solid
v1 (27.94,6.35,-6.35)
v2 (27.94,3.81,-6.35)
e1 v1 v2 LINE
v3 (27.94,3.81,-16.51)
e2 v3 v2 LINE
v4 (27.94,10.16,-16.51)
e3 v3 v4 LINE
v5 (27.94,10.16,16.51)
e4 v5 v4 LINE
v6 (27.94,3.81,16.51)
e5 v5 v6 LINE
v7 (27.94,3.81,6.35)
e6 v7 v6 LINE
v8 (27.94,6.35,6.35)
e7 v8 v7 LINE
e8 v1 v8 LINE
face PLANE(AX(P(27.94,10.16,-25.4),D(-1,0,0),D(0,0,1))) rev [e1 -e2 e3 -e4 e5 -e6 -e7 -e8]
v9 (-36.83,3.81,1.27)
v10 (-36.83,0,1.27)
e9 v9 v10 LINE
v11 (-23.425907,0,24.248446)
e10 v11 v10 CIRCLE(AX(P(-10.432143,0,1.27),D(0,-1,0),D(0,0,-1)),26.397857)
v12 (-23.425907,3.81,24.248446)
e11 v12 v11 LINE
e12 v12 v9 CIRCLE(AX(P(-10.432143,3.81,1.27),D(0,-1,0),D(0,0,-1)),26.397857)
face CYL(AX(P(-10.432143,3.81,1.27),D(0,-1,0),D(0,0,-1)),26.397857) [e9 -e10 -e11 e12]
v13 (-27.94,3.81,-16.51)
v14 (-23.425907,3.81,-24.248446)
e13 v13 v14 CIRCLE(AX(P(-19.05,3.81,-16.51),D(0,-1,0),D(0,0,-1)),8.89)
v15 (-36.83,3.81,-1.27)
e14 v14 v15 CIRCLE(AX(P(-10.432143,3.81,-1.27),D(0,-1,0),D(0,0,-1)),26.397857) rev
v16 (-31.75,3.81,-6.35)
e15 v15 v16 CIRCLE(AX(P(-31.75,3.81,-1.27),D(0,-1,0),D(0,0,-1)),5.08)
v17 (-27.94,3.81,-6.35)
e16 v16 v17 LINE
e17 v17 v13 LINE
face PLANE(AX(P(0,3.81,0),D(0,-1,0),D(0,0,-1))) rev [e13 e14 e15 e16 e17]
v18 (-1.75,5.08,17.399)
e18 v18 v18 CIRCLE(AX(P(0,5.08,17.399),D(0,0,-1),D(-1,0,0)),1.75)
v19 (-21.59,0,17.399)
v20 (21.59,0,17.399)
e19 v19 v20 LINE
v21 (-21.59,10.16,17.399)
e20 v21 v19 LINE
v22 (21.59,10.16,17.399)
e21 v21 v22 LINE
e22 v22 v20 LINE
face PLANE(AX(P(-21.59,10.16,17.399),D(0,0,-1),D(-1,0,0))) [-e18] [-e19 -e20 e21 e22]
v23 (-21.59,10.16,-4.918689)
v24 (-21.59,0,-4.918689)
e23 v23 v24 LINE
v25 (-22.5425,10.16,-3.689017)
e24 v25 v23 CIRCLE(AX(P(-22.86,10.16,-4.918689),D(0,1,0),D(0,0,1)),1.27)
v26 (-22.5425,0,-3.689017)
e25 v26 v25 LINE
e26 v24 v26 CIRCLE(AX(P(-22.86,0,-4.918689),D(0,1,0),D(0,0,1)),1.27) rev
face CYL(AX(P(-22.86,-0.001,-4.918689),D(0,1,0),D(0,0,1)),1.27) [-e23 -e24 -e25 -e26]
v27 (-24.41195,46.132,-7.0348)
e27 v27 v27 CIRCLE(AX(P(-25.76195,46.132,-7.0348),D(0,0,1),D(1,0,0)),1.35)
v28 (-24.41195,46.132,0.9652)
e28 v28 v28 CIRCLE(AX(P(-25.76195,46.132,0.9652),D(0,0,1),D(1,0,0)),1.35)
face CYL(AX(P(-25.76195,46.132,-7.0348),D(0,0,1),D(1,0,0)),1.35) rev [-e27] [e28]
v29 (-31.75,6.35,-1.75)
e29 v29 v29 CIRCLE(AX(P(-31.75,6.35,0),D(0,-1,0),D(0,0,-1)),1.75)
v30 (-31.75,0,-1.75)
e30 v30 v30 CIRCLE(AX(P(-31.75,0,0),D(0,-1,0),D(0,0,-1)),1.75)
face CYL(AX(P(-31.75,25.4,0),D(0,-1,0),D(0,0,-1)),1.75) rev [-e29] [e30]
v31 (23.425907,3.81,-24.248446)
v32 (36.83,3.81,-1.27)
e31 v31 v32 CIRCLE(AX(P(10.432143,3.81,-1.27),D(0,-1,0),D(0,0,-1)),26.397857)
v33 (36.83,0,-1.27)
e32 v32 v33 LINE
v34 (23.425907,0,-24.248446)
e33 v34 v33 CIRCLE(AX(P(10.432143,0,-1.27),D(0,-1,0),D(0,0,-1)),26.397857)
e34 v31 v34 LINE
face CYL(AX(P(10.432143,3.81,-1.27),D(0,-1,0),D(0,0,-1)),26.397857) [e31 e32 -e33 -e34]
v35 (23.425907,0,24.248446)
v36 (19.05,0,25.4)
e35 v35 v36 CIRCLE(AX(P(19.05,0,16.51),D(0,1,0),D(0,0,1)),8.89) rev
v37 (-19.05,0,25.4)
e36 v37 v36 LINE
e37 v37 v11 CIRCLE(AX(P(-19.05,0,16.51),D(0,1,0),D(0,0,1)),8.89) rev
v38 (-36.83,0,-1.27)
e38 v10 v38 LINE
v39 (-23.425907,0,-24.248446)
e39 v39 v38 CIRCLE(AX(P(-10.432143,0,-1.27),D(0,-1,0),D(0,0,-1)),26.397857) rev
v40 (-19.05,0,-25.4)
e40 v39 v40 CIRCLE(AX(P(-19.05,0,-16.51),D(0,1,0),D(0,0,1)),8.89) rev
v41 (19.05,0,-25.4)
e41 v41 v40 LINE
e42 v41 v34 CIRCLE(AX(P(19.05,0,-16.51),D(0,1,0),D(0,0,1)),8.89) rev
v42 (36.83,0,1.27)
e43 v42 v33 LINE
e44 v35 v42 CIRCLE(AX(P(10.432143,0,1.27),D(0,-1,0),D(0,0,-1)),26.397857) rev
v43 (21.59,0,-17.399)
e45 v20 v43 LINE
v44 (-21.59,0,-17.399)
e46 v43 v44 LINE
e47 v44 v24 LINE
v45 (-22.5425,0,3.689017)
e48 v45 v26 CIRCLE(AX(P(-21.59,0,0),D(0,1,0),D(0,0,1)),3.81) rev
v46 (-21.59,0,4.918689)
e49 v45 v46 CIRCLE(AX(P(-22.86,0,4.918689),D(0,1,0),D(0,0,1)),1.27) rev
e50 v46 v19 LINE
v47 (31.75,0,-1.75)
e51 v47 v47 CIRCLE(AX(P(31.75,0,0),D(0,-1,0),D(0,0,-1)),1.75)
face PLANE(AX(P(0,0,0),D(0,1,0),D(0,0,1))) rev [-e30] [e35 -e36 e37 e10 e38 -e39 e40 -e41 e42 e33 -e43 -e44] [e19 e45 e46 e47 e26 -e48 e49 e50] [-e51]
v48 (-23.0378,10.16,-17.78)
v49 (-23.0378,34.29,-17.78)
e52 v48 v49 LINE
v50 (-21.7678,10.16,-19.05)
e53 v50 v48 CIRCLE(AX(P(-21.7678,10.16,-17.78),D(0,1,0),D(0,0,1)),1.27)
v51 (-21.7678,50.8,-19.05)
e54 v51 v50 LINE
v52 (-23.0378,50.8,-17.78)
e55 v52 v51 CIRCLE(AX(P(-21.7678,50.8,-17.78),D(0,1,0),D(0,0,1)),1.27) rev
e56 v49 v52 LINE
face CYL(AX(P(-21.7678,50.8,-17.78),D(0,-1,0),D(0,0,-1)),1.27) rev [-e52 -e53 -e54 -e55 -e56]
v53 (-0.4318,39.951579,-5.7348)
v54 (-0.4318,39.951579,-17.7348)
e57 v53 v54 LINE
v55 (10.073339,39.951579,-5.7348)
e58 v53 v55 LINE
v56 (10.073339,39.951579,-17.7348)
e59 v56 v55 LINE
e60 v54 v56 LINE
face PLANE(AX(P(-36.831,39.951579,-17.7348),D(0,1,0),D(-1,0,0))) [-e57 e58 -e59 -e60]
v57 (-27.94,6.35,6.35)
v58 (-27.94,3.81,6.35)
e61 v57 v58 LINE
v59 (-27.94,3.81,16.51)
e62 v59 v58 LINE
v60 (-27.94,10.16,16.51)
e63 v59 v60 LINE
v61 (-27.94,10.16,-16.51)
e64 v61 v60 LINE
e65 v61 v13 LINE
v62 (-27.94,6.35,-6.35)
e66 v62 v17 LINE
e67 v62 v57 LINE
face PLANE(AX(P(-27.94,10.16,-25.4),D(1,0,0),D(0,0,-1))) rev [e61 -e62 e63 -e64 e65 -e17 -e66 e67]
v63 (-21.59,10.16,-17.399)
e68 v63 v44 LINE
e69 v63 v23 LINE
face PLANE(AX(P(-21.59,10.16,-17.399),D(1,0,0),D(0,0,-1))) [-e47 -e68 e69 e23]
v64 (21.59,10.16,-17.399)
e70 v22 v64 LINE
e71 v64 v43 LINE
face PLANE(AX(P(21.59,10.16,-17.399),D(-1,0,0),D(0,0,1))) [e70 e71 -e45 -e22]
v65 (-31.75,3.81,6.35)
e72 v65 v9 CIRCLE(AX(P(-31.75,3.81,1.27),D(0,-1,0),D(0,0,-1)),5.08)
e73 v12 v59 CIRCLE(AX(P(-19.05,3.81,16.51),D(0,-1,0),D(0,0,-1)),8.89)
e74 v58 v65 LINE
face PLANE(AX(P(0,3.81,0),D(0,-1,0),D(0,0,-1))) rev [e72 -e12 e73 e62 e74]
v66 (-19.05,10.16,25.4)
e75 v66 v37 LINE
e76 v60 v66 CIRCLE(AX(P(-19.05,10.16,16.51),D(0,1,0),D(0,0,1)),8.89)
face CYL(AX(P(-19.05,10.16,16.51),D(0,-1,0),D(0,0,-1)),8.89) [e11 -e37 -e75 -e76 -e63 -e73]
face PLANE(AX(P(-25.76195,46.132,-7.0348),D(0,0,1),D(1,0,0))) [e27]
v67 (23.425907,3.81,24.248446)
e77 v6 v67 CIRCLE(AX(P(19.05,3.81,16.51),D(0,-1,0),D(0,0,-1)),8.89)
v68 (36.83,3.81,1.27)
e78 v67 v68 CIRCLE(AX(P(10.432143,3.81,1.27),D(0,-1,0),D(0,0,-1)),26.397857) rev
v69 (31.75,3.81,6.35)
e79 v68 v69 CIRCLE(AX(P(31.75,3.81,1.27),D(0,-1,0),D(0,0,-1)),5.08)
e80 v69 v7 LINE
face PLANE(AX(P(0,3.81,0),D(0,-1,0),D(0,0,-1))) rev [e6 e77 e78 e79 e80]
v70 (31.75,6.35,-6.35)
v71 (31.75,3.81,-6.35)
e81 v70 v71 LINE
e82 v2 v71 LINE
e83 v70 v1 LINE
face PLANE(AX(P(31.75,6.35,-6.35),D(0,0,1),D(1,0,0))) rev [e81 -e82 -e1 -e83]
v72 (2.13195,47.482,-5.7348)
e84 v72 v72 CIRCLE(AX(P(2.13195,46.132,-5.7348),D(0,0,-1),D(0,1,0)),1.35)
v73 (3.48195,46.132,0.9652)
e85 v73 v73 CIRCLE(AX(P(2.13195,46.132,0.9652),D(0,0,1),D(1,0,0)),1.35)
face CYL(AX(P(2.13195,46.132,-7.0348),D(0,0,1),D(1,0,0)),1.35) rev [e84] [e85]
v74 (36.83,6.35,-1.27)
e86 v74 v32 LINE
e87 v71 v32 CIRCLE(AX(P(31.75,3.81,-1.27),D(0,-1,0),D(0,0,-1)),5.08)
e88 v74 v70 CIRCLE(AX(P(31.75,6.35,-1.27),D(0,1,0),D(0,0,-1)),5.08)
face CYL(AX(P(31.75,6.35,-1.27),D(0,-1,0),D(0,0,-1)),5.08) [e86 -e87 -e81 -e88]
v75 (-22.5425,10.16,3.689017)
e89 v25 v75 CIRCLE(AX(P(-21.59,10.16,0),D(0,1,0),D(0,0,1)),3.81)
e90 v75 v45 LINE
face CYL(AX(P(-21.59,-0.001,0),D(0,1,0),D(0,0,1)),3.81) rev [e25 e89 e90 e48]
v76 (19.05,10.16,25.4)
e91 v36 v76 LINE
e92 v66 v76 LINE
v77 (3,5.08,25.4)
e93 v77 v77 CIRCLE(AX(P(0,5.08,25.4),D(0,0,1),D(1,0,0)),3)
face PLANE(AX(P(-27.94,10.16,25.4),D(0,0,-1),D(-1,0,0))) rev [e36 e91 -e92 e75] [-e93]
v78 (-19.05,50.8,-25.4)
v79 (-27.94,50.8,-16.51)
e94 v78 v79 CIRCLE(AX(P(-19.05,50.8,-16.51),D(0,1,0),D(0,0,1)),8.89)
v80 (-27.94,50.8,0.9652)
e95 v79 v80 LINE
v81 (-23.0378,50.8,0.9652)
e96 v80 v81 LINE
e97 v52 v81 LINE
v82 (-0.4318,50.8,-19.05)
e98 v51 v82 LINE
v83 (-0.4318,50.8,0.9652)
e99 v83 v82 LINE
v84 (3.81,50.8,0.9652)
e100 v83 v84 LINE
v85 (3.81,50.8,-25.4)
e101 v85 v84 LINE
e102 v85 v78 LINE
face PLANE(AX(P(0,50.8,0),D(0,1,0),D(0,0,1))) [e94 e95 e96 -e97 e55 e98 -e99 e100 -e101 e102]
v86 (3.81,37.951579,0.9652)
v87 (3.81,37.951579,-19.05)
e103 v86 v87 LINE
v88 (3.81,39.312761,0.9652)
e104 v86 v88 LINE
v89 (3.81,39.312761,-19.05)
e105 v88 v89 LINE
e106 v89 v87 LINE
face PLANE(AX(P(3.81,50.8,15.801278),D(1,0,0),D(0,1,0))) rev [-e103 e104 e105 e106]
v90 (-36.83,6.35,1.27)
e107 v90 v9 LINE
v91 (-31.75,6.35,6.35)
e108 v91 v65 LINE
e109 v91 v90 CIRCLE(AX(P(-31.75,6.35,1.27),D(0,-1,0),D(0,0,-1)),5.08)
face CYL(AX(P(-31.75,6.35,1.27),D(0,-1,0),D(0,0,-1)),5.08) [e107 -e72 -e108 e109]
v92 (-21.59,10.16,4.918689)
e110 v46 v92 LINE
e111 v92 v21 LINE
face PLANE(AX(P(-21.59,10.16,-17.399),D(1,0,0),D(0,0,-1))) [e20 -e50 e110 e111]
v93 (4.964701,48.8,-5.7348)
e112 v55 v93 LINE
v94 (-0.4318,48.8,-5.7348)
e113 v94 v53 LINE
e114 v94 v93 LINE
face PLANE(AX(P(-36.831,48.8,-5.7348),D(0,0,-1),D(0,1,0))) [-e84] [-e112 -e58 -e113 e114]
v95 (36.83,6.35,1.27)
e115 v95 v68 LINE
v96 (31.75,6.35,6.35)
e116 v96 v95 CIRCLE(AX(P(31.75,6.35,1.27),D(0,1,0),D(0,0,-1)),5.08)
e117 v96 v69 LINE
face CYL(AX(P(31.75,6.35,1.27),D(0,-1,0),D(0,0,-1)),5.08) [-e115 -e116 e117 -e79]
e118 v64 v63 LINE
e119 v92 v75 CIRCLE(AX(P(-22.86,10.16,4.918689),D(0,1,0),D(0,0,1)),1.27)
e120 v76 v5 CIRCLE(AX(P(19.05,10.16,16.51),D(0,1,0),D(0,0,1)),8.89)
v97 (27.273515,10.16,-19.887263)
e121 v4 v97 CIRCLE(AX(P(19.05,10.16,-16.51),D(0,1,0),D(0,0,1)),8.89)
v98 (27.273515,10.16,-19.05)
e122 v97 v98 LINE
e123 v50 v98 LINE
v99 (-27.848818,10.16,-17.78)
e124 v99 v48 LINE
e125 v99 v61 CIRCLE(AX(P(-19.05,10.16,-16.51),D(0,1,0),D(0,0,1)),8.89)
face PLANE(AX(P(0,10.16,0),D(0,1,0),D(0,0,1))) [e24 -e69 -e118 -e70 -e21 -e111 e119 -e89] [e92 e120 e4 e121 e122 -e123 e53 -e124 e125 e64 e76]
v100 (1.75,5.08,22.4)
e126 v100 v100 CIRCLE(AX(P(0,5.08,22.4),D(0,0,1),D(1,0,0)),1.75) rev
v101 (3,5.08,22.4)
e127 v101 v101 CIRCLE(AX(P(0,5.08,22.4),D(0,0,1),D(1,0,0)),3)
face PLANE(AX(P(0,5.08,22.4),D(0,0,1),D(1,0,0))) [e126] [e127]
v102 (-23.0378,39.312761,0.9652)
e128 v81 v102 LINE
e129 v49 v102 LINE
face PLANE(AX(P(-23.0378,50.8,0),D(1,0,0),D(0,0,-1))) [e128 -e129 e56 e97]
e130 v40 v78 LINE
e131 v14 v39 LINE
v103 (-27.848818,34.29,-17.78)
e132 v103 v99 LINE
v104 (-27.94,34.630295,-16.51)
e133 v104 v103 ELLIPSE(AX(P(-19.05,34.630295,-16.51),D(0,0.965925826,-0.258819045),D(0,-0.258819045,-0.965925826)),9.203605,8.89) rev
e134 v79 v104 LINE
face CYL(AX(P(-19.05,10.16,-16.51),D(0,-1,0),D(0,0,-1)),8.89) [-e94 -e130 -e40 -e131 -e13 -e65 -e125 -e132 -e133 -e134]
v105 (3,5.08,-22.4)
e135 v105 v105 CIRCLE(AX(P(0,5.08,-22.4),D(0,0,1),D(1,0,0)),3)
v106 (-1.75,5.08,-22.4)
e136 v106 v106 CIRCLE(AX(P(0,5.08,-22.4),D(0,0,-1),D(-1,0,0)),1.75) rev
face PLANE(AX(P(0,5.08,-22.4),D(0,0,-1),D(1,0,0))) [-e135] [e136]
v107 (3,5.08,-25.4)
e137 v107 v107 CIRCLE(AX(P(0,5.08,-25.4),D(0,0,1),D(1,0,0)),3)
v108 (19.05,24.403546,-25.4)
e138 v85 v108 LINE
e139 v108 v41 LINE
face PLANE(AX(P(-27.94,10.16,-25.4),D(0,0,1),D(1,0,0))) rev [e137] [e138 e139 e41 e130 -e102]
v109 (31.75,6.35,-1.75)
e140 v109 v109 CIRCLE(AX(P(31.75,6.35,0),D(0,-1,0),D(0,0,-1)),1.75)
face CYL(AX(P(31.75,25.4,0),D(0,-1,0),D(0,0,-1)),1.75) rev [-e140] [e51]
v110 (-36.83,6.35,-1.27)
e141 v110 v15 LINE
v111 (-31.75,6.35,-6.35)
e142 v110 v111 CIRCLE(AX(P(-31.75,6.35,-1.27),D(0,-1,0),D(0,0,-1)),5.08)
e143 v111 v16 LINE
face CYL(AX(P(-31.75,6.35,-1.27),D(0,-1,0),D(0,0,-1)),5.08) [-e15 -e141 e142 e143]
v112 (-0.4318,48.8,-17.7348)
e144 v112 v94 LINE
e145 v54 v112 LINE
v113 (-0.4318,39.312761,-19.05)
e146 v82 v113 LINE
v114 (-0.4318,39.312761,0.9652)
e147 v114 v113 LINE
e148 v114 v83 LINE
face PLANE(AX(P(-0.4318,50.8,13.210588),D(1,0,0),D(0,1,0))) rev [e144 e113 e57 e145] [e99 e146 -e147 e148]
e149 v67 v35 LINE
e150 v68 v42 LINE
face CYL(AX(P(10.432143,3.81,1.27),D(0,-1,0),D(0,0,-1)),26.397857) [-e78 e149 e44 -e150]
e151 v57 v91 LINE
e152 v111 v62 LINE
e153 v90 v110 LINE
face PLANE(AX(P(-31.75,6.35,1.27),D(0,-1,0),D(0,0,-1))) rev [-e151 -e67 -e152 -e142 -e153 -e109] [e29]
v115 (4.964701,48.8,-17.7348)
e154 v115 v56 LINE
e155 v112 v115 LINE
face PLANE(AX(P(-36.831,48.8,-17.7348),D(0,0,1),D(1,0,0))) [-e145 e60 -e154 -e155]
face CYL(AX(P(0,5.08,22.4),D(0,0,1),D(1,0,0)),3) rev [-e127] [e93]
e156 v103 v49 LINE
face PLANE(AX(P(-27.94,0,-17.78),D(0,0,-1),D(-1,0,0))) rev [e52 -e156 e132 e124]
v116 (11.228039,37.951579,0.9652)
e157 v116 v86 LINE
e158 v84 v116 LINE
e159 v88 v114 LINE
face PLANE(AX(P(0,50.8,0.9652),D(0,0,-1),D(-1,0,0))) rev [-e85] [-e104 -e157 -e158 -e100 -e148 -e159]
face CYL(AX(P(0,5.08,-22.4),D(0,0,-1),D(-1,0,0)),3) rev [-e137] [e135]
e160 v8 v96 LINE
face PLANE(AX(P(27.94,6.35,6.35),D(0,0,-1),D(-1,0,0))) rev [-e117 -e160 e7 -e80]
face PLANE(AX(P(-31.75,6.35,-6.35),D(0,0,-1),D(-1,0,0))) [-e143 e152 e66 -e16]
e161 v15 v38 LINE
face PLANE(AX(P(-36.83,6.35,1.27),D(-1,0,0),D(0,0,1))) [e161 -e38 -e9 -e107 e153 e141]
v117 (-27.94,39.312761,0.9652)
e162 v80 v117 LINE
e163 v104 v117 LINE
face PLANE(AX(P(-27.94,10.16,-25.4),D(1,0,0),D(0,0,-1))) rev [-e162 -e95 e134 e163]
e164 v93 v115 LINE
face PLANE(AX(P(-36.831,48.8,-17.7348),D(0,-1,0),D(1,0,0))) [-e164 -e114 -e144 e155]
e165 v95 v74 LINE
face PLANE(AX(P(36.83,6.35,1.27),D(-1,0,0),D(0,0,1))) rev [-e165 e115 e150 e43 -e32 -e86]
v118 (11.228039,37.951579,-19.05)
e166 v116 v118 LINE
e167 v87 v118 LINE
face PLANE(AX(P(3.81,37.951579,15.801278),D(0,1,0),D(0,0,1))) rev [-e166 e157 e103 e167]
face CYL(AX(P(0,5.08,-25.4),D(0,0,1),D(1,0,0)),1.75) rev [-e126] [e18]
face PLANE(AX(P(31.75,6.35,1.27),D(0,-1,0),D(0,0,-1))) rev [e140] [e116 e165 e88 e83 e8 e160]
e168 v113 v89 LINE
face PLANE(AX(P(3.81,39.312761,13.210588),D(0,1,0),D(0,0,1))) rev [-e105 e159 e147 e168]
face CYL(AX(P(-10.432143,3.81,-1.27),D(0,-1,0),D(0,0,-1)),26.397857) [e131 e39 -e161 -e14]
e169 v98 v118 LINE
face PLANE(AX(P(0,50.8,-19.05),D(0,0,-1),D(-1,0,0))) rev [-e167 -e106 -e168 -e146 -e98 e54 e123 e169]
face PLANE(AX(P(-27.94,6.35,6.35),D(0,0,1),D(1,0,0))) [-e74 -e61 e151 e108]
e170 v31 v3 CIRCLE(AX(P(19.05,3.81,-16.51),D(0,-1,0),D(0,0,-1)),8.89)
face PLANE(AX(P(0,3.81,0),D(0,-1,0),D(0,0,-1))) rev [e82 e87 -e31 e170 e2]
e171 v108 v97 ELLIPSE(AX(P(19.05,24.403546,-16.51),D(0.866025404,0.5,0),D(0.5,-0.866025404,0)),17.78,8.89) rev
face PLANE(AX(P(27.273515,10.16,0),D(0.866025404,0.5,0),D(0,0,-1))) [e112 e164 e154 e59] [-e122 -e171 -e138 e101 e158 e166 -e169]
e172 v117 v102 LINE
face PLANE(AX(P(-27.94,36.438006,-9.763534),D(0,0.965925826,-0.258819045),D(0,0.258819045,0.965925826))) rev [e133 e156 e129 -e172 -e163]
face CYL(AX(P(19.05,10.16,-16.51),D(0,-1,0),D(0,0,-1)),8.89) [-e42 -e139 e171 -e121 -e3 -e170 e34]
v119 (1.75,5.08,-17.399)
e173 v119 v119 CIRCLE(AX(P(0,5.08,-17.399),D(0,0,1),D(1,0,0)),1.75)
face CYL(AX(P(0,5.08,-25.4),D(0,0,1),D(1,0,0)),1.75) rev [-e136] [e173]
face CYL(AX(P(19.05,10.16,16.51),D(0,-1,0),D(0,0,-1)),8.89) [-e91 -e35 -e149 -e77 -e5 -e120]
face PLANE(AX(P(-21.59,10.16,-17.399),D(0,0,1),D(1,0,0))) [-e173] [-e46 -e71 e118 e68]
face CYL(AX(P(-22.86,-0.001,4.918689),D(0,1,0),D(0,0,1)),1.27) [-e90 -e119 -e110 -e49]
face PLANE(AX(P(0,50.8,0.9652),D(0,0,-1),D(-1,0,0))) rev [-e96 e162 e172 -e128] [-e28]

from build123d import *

# Parameters (mm, degrees)
SKETCH1_W           = 55.88
SKETCH1_H           = 50.8
SKETCH1_W_2         = 43.18
SKETCH1_H_2         = 34.798
BOSS_EXTRUDE1_DEPTH = 10.16
SKETCH2_R           = 1.75
CUT_EXTRUDE1_DEPTH  = 59.860081549
SKETCH3_R           = 3
CUT_EXTRUDE2_DEPTH  = 3
SKETCH4_W           = 4.9022
SKETCH4_H           = 20.0152
BOSS_EXTRUDE2_DEPTH = 40.64
CUT_EXTRUDE3_DEPTH  = 77.318648395
FILLET1_R           = 8.89
CHAMFER2_SIZE2      = 40.64
CHAMFER2_SIZE       = 23.46351494
SKETCH6_W           = 4.2418
SKETCH6_H           = 11.487238798
BOSS_EXTRUDE3_DEPTH = 20.0152
BOSS_EXTRUDE5_DEPTH = 20.0152
SKETCH9_R           = 1.35
CUT_EXTRUDE4_DEPTH  = 8
FILLET2_R           = 1.27
BOSS_EXTRUDE6_DEPTH = 6.35
SKETCH11_R          = 1.75
CUT_EXTRUDE5_DEPTH  = 25.4
BOSS_EXTRUDE7_DEPTH = 3.81
CUT_EXTRUDE6_REACH  = 76.62
SKETCH13_W          = 12
SKETCH13_H          = 8.848420696
CUT_EXTRUDE9_REACH  = 62.442
FILLET3_R           = 1.27


# Some blends are built 0.0001 mm under size
with BuildPart() as part:
    # Sketch1 → Boss-Extrude1 (new body)
    with BuildSketch(Plane(origin=(0, 0, 0), x_dir=(1, 0, 0), z_dir=(0, 1, 0))):
        Rectangle(SKETCH1_W, SKETCH1_H)
        Rectangle(SKETCH1_W_2, SKETCH1_H_2, mode=Mode.SUBTRACT)
    extrude(amount=BOSS_EXTRUDE1_DEPTH)

    # Sketch2 → Cut-Extrude1 (cut, through all)
    with BuildSketch(Plane.XY.offset(25.4)):
        with Locations((0, 5.08)):
            Circle(SKETCH2_R)
    extrude(amount=-CUT_EXTRUDE1_DEPTH, mode=Mode.SUBTRACT)

    # Sketch3 → Cut-Extrude2 (cut)
    with BuildSketch(Plane.XY.offset(25.4)):
        with Locations((0, 5.08)):
            Circle(SKETCH3_R)
    cut_extrude2 = extrude(amount=-CUT_EXTRUDE2_DEPTH, mode=Mode.SUBTRACT)

    # Sketch4 → Boss-Extrude2 (add)
    with BuildSketch(Plane(origin=(0, 10.16, 0), x_dir=(1, 0, 0), z_dir=(0, 1, 0))):
        with Locations((-25.4889, 9.0424)):
            Rectangle(SKETCH4_W, SKETCH4_H)
        Polygon((3.81, 25.4), (-27.94, 25.4), (-27.94, 19.05), (-23.0378, 19.05), (3.81, 19.05), align=None)
    extrude(amount=BOSS_EXTRUDE2_DEPTH)

    # Sketch5 → Cut-Extrude3 (cut, through all)
    with BuildSketch(Plane(origin=(-23.0378, 0, 0), x_dir=(0, 0, -1), z_dir=(1, 0, 0))):
        Polygon((17.78, 34.29), (-0.9652, 39.312761202), (-0.9652, 10.16), (17.78, 10.16), align=None)
    extrude(amount=-CUT_EXTRUDE3_DEPTH, mode=Mode.SUBTRACT)

    # Fillet1
    # the kernel refuses this fillet: 8.89 mm, written as the material it takes off along each edge
    with BuildSketch(Plane(origin=(-27.94, -22.225, 25.4), x_dir=(1, 0, 0), z_dir=(0, 1, 0)), Plane(origin=(27.94, -22.225, -25.4), x_dir=(-1, 0, 0), z_dir=(0, 1, 0))) as fillet1_piece_1:
        with BuildLine():
            CenterArc((FILLET1_R, FILLET1_R), FILLET1_R, 180, 90)
            Line((0, FILLET1_R), (0, 0))
            Line((0, 0), (FILLET1_R, 0))
        make_face()
    extrude(amount=54.61, mode=Mode.SUBTRACT)
    with BuildSketch(Plane(origin=(-27.94, -22.225, -25.4), x_dir=(1, 0, 0), z_dir=(0, 1, 0))) as fillet1_piece_2:
        with BuildLine():
            CenterArc((FILLET1_R, -FILLET1_R), FILLET1_R, 90, 90)
            Line((0, -FILLET1_R), (0, 0))
            Line((0, 0), (FILLET1_R, 0))
        make_face()
    extrude(amount=95.25, mode=Mode.SUBTRACT)
    with BuildSketch(Plane(origin=(27.94, -22.225, 25.4), x_dir=(-1, 0, 0), z_dir=(0, 1, 0))) as fillet1_piece_3:
        with BuildLine():
            CenterArc((FILLET1_R, -FILLET1_R), FILLET1_R, 90, 90)
            Line((0, -FILLET1_R), (0, 0))
            Line((0, 0), (FILLET1_R, 0))
        make_face()
    extrude(amount=54.61, mode=Mode.SUBTRACT)

    # Chamfer2
    chamfer2_edges = [part.edges().sort_by_distance(p)[0] for p in [
        (3.81, 10.16, -22.225),
    ]]
    chamfer2_side = [part.faces().sort_by_distance(p)[0] for p in [
        (4.279270299, 10.16, -22.225),
    ]]
    chamfer(chamfer2_edges, length=CHAMFER2_SIZE - 0.0001, length2=CHAMFER2_SIZE2 - 0.0001, reference=chamfer2_side[0])  # a hair under: the kernel refuses the full size

    # Sketch6 → Boss-Extrude3 (add)
    with BuildSketch(Plane.XY.offset(-19.05)):
        with Locations((1.6891, 45.056380601)):
            Rectangle(SKETCH6_W, SKETCH6_H)
    extrude(amount=BOSS_EXTRUDE3_DEPTH)

    # Sketch8 → Boss-Extrude5 (add)
    with BuildSketch(Plane.XY.offset(-19.05)):
        Polygon((3.81, 50.8), (3.81, 37.951579304), (11.228039147, 37.951579304), align=None)
    extrude(amount=BOSS_EXTRUDE5_DEPTH)

    # Sketch9 → Cut-Extrude4 (cut)
    with BuildSketch(Plane.XY.offset(0.9652)):
        with Locations((2.13195, 46.132)):
            Circle(SKETCH9_R)
        with Locations((-25.76195, 46.132)):
            Circle(SKETCH9_R)
    extrude(amount=-CUT_EXTRUDE4_DEPTH, mode=Mode.SUBTRACT)

    # Fillet2
    fillet2_edges = [part.edges().sort_by_distance(p)[0] for p in [
        (-23.0378, 30.48, -19.05),
    ]]
    fillet(fillet2_edges, radius=FILLET2_R)

    # Mirror1: Cut-Extrude2 across plane
    add(cut_extrude2.mirror(Plane.XY), mode=Mode.SUBTRACT)

    # Sketch10 → Boss-Extrude6 (add)
    with BuildSketch(Plane.XZ):
        with BuildLine():
            Line((-27.94, 0), (-27.94, 6.35))
            Line((-27.94, 6.35), (-31.75, 6.35))
            ThreePointArc((-31.75, 6.35), (-35.342102448, 4.862102448), (-36.83, 1.27))
            Line((-36.83, 1.27), (-36.83, -1.27))
            ThreePointArc((-36.83, -1.27), (-35.342102448, -4.862102448), (-31.75, -6.35))
            Line((-31.75, -6.35), (-27.94, -6.35))
            Line((-27.94, -6.35), (-27.94, 0))
        make_face()
    boss_extrude6 = extrude(amount=-BOSS_EXTRUDE6_DEPTH)

    # Mirror2: Boss-Extrude6 across plane
    add(boss_extrude6.mirror(Plane(origin=(0, 0, 0), x_dir=(0, 0, 1), z_dir=(1, 0, 0))))

    # Sketch11 → Cut-Extrude5 (cut)
    with BuildSketch(Plane.XZ):
        with Locations(Location((-31.75, 0, 0), (0, 0, 270))):
            Circle(SKETCH11_R)
        with Locations(Location((31.75, 0, 0), (0, 0, 270))):
            Circle(SKETCH11_R)
    extrude(amount=-CUT_EXTRUDE5_DEPTH, mode=Mode.SUBTRACT)

    # Sketch12 → Boss-Extrude7 (add)
    with BuildSketch(Plane.XZ):
        with BuildLine():
            ThreePointArc((-27.94, 16.51), (-26.728994429, 20.989413417), (-23.425906736, 24.248445596))
            ThreePointArc((-23.425906736, 24.248445596), (-33.234054886, 14.57111535), (-36.83, 1.27))
            ThreePointArc((-36.83, 1.27), (-35.342102448, 4.862102448), (-31.75, 6.35))
            Line((-31.75, 6.35), (-27.94, 6.35))
            Line((-27.94, 6.35), (-27.94, 16.51))
        make_face()
        with BuildLine():
            ThreePointArc((-31.75, -6.35), (-35.342102448, -4.862102448), (-36.83, -1.27))
            ThreePointArc((-36.83, -1.27), (-33.234054886, -14.57111535), (-23.425906736, -24.248445596))
            ThreePointArc((-23.425906736, -24.248445596), (-26.728994429, -20.989413417), (-27.94, -16.51))
            Line((-27.94, -16.51), (-27.94, -6.35))
            Line((-27.94, -6.35), (-31.75, -6.35))
        make_face()
        with BuildLine():
            ThreePointArc((23.425906736, -24.248445596), (33.234054886, -14.57111535), (36.83, -1.27))
            ThreePointArc((36.83, -1.27), (35.342102448, -4.862102448), (31.75, -6.35))
            Line((31.75, -6.35), (27.94, -6.35))
            Line((27.94, -6.35), (27.94, -16.51))
            ThreePointArc((27.94, -16.51), (26.728994429, -20.989413417), (23.425906736, -24.248445596))
        make_face()
        with BuildLine():
            ThreePointArc((36.83, 1.27), (33.234054886, 14.57111535), (23.425906736, 24.248445596))
            ThreePointArc((23.425906736, 24.248445596), (26.728994429, 20.989413417), (27.94, 16.51))
            Line((27.94, 16.51), (27.94, 6.35))
            Line((27.94, 6.35), (31.75, 6.35))
            ThreePointArc((31.75, 6.35), (35.342102448, 4.862102448), (36.83, 1.27))
        make_face()
    extrude(amount=-BOSS_EXTRUDE7_DEPTH)

    # Sketch13 → Cut-Extrude6 (cut, up to next)
    with BuildSketch(Plane.ZY.offset(-11.5682), mode=Mode.PRIVATE) as cut_extrude6_sk1:
        with Locations((-11.7348, 44.375789652)):
            Rectangle(SKETCH13_W, SKETCH13_H)
    cut_extrude6_tool1 = extrude(cut_extrude6_sk1.sketch, amount=CUT_EXTRUDE6_REACH, mode=Mode.PRIVATE) & part.part
    add(cut_extrude6_tool1.solids().sort_by_distance((11.5682, 44.37579, -11.7348))[0], mode=Mode.SUBTRACT)

    # Sketch15 → Cut-Extrude9 (cut, up to next)
    with BuildSketch(Plane(origin=(0, 10.16, 0), x_dir=(1, 0, 0), z_dir=(0, 1, 0)), mode=Mode.PRIVATE) as cut_extrude9_sk1:
        with BuildLine():
            Line((-21.59, 3.81), (-21.59, -3.81))
            ThreePointArc((-21.59, -3.81), (-25.4, 0), (-21.59, 3.81))
        make_face()
    cut_extrude9_tool1 = extrude(cut_extrude9_sk1.sketch, amount=-CUT_EXTRUDE9_REACH, mode=Mode.PRIVATE) & part.part
    add(cut_extrude9_tool1.solids().sort_by_distance((-23.207014, 10.16, 0))[0], mode=Mode.SUBTRACT)

    # Fillet3
    fillet3_edges = [part.edges().sort_by_distance(p)[0] for p in [
        (-21.59, 5.08, 3.81),
        (-21.59, 5.08, -3.81),
    ]]
    fillet(fillet3_edges, radius=FILLET3_R)


solid = part.part
